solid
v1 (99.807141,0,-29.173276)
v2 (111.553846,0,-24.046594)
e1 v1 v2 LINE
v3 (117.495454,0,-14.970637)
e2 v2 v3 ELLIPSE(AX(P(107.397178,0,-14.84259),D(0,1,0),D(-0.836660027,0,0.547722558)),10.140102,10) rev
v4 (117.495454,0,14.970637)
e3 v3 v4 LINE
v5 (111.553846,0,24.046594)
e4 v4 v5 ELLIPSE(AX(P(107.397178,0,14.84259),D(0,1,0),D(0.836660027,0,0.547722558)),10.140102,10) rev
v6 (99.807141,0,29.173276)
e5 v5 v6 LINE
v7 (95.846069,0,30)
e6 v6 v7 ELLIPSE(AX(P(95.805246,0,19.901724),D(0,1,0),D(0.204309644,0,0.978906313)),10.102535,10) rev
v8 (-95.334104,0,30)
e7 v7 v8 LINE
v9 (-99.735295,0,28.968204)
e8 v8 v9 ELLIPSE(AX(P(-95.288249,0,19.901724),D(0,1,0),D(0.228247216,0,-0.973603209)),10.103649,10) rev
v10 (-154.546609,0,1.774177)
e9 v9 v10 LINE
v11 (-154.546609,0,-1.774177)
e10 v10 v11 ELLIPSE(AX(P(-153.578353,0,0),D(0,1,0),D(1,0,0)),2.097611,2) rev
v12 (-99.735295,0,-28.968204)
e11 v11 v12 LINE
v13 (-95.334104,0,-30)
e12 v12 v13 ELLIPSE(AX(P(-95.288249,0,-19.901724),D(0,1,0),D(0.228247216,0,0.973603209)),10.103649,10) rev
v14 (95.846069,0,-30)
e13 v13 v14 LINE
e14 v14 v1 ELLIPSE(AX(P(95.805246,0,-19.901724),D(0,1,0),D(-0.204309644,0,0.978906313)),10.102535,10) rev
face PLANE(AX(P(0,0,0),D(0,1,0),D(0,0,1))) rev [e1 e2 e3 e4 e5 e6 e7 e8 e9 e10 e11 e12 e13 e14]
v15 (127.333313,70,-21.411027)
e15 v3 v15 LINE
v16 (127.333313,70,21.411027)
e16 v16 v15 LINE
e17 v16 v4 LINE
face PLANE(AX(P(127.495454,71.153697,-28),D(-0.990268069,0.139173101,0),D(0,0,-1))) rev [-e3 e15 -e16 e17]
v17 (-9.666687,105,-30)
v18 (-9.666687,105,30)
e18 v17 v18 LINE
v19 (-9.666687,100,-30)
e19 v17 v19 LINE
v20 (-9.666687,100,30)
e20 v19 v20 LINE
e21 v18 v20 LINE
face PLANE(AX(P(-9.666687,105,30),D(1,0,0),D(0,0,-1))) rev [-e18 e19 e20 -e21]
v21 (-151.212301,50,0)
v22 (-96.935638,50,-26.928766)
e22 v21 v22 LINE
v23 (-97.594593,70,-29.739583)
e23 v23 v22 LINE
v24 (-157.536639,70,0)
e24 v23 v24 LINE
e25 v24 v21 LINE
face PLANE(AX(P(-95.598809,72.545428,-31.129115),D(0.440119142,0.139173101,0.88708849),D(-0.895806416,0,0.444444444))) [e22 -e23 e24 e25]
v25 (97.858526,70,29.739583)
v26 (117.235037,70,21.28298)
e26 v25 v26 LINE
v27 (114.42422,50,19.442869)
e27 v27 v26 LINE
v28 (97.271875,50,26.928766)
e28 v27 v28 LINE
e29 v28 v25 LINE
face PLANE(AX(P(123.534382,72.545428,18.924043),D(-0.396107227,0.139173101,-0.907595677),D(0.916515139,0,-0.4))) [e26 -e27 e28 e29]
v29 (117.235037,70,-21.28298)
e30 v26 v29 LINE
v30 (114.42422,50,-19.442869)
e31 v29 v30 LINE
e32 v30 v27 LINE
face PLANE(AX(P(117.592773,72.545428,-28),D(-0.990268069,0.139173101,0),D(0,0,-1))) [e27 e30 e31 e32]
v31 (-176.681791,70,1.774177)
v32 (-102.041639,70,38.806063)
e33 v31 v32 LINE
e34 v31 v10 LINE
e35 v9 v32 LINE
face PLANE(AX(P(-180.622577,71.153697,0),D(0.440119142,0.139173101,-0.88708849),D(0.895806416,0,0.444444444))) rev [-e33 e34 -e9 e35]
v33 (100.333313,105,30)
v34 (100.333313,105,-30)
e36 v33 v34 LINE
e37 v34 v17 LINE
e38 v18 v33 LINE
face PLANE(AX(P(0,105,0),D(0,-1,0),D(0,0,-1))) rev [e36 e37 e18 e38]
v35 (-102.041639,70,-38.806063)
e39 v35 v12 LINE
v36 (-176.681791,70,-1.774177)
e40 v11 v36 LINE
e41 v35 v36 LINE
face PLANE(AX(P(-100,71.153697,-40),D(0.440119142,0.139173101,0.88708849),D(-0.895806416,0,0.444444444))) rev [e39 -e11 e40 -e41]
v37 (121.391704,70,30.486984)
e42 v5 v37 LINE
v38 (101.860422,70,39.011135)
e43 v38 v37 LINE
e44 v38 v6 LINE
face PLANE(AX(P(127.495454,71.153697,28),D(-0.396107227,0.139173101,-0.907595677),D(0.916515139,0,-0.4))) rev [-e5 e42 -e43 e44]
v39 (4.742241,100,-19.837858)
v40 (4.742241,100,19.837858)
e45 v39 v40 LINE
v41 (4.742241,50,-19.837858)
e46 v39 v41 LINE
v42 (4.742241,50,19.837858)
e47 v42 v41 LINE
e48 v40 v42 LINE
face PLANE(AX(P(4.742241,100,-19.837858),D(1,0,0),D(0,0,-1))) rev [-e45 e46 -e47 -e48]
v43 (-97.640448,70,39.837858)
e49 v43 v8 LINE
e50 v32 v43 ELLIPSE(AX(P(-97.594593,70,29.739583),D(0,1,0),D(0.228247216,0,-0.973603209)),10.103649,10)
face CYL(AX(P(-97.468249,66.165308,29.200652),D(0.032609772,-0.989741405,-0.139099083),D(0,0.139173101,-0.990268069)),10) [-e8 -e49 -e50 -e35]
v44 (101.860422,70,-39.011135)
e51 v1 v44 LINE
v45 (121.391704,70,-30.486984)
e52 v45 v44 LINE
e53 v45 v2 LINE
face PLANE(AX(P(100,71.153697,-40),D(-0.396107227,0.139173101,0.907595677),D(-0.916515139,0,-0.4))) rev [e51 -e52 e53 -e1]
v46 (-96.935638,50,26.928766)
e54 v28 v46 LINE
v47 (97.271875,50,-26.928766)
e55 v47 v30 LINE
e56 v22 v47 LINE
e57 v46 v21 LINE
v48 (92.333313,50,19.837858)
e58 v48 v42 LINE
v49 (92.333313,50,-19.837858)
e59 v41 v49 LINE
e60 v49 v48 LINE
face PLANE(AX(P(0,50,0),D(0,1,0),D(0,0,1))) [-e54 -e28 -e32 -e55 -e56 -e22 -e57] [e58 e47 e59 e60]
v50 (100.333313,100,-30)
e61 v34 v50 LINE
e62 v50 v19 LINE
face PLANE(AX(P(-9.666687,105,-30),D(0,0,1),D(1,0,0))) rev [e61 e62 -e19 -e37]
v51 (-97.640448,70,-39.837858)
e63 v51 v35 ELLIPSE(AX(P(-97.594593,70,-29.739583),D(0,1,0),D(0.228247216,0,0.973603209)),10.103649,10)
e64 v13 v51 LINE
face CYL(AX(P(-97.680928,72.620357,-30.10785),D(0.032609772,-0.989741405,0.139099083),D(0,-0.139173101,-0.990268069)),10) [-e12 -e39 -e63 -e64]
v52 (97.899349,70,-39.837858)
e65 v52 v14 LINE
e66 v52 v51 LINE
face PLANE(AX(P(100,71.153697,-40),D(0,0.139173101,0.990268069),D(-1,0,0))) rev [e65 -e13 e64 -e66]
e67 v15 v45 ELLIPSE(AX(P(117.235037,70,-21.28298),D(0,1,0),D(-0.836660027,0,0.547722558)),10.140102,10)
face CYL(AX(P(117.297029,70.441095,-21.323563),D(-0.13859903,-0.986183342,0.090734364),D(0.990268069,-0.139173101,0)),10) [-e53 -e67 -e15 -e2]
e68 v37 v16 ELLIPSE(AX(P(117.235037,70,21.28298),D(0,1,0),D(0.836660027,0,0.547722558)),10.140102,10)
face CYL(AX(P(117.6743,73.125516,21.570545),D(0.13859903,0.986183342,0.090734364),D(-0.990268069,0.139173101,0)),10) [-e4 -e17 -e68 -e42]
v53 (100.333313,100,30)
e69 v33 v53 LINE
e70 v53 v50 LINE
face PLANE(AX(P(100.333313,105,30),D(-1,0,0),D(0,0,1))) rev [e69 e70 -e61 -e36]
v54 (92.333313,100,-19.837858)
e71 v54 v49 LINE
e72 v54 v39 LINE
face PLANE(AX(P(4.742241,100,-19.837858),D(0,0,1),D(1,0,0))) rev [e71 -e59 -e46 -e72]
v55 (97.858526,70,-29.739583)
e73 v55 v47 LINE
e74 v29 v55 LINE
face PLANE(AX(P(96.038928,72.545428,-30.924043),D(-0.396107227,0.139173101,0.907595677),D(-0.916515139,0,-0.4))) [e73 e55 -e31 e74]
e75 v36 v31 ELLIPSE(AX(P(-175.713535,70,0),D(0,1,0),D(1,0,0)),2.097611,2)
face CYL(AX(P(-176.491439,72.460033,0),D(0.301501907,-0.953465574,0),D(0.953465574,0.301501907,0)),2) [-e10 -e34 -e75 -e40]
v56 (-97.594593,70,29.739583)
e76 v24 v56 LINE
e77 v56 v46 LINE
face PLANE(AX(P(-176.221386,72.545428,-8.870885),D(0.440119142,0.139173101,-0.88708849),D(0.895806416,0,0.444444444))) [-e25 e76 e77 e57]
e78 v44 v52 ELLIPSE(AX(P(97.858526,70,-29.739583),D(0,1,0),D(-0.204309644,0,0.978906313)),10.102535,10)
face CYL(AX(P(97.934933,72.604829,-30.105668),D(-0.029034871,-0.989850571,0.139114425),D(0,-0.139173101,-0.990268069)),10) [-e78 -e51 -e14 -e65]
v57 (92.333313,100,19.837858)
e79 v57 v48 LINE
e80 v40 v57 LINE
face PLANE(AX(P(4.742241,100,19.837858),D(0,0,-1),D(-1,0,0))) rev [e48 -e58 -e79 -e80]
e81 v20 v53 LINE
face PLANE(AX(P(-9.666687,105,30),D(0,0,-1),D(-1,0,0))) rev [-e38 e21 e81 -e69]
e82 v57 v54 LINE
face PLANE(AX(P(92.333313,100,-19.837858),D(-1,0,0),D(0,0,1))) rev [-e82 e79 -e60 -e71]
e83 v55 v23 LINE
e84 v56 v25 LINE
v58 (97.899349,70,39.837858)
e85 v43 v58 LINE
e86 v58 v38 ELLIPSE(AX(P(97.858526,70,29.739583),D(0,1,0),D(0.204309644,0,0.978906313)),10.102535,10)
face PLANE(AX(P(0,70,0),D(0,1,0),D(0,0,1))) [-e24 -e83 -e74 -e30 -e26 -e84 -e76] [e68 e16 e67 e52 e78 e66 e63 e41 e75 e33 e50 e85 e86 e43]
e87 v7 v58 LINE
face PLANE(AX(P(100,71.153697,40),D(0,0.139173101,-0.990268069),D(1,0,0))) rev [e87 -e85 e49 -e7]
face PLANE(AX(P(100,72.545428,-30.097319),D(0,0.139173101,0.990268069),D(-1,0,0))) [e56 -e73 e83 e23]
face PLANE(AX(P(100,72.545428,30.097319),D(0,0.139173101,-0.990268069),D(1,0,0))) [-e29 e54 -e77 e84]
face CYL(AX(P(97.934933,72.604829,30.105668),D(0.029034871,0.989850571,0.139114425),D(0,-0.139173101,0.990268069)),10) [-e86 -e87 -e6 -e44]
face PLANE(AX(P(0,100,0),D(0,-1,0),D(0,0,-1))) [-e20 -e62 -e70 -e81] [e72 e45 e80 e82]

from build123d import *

# Parameters (mm, degrees)
SALIENTE_EXTRUIR1_DEPTH = 70
CHAFL_N1_SIZE           = 71.153697224
CHAFL_N1_SIZE_2         = 10
CHAFL_N2_SIZE           = 10
CHAFL_N2_SIZE_2         = 71.153697224
CHAFL_N3_SIZE           = 10
CHAFL_N3_SIZE_2         = 71.153697224
CHAFL_N4_SIZE           = 10
CHAFL_N4_SIZE_2         = 71.153697224
CHAFL_N6_SIZE           = 10
CHAFL_N6_SIZE_2         = 71.153697224
CHAFL_N7_SIZE           = 71.153697224
CHAFL_N7_SIZE_2         = 10
CHAFL_N8_SIZE           = 10
CHAFL_N8_SIZE_2         = 71.153697224
VACIADO2_DEPTH          = 20
VACIADO2_DRAFT          = -8
CROQUIS3_W              = 87.591071548
CROQUIS3_H              = 39.675716858
SALIENTE_EXTRUIR3_DEPTH = 30
CROQUIS4_W              = 110
CROQUIS4_H              = 60
SALIENTE_EXTRUIR4_DEPTH = 5
REDONDEO2_R             = 2
REDONDEO4_R             = 10
REDONDEO5_R             = 10


# Read off the part's stored shape, not the designer's step: Vaciado2
with BuildPart() as part:
    # Croquis1 → Saliente-Extruir1 (new body)
    with BuildSketch(Plane(origin=(0, 0, 0), x_dir=(1, 0, 0), z_dir=(0, 1, 0))):
        Polygon((100, -40), (-100, -40), (-180.622577483, 0), (-100, 40), (100, 40), (127.49545417, 28), (127.49545417, -28), align=None)
    extrude(amount=SALIENTE_EXTRUIR1_DEPTH)

    # Chaflán1
    # the kernel refuses this chamfer: 71.153697224, 10 mm, written as the material it takes off along each edge
    with BuildSketch(Plane(origin=(284.933017826, 0, 40), x_dir=(0, 0.999985663281603, 0.005354739139527623), z_dir=(-1, 0, 0))) as chafl_n1_piece_1:
        Polygon((CHAFL_N1_SIZE * 0.999985663279, CHAFL_N1_SIZE * 0.00535473913952), (-CHAFL_N1_SIZE_2 * 0.00535473913953, CHAFL_N1_SIZE_2 * 0.999985663282), (0, 0), align=None)
    extrude(amount=569.866035651, mode=Mode.SUBTRACT)

    # Chaflán2
    # the kernel refuses this chamfer: 71.153697224, 10 mm, written as the material it takes off along each edge
    with BuildSketch(Plane(origin=(45.508539616, 0, 112.192452367), x_dir=(0.4289599478157497, -0.26166085119417803, -0.8645964157468197), z_dir=(-0.895806416477617, 0, -0.44444444444444353))) as chafl_n2_piece_1:
        Polygon((CHAFL_N2_SIZE * 0.965159882585, -CHAFL_N2_SIZE * 0.261660851194), (-CHAFL_N2_SIZE_2 * 0.261660851194, -CHAFL_N2_SIZE_2 * 0.965159882583), (0, 0), align=None)
    extrude(amount=437.366035651, mode=Mode.SUBTRACT)

    # Chaflán3
    # the kernel refuses this chamfer: 71.153697224, 10 mm, written as the material it takes off along each edge
    with BuildSketch(Plane(origin=(-335.03676147, 0, 76.61088931), x_dir=(0.4289599478157518, -0.2616608511941785, 0.8645964157468186), z_dir=(0.895806416477616, 0, -0.4444444444444457))) as chafl_n3_piece_1:
        Polygon((CHAFL_N3_SIZE * 0.965159882585, -CHAFL_N3_SIZE * 0.261660851194), (-CHAFL_N3_SIZE_2 * 0.261660851194, -CHAFL_N3_SIZE_2 * 0.965159882583), (0, 0), align=None)
    extrude(amount=447.307518774, mode=Mode.SUBTRACT)

    # Chaflán4
    # the kernel refuses this chamfer: 71.153697224, 10 mm, written as the material it takes off along each edge
    with BuildSketch(Plane(origin=(-262.433017825, 0, -40), x_dir=(0, -0.26166085119417826, 0.9651598825854388), z_dir=(1, 0, 0))) as chafl_n4_piece_1:
        Polygon((CHAFL_N4_SIZE * 0.965159882585, -CHAFL_N4_SIZE * 0.261660851194), (-CHAFL_N4_SIZE_2 * 0.261660851194, -CHAFL_N4_SIZE_2 * 0.965159882583), (0, 0), align=None)
    extrude(amount=547.366035651, mode=Mode.SUBTRACT)

    # Chaflán6
    # the kernel refuses this chamfer: 71.153697224, 10 mm, written as the material it takes off along each edge
    with BuildSketch(Plane(origin=(-46.581032062, 0, -103.97320713), x_dir=(-0.3860639530341748, -0.2616608511941783, 0.8845836439364931), z_dir=(0.9165151389911683, 0, 0.3999999999999993))) as chafl_n6_piece_1:
        Polygon((CHAFL_N6_SIZE * 0.965159882585, -CHAFL_N6_SIZE * 0.261660851194), (-CHAFL_N6_SIZE_2 * 0.261660851194, -CHAFL_N6_SIZE_2 * 0.965159882583), (0, 0), align=None)
    extrude(amount=374.866035651, mode=Mode.SUBTRACT)

    # Chaflán7
    # the kernel refuses this chamfer: 71.153697224, 10 mm, written as the material it takes off along each edge
    with BuildSketch(Plane(origin=(296.989364706, 0, -45.97320713), x_dir=(0.002141895655810909, 0.999985663281603, 0.004907699486725296), z_dir=(-0.9165151389911683, 0, 0.3999999999999993))) as chafl_n7_piece_1:
        Polygon((CHAFL_N7_SIZE * 0.999985663279, CHAFL_N7_SIZE * 0.00535473913952), (-CHAFL_N7_SIZE_2 * 0.00535473913953, CHAFL_N7_SIZE_2 * 0.999985663282), (0, 0), align=None)
    extrude(amount=374.866035651, mode=Mode.SUBTRACT)

    # Chaflán8
    # the kernel refuses this chamfer: 71.153697224, 10 mm, written as the material it takes off along each edge
    with BuildSketch(Plane(origin=(127.49545417, 0, -202.022123314), x_dir=(-0.9651598825854388, -0.26166085119417826, 0), z_dir=(0, 0, 1))) as chafl_n8_piece_1:
        Polygon((CHAFL_N8_SIZE * 0.965159882585, -CHAFL_N8_SIZE * 0.261660851194), (-CHAFL_N8_SIZE_2 * 0.261660851194, -CHAFL_N8_SIZE_2 * 0.965159882583), (0, 0), align=None)
    extrude(amount=404.044246628, mode=Mode.SUBTRACT)


with BuildPart() as vaciado2_tool:
    # Vaciado2 outline → Vaciado2 (with draft: the straight prism first)
    with BuildSketch(Plane(origin=(0, 50, 0), x_dir=(1, 0, 0), z_dir=(0, 1, 0))):
        Polygon((114.42422018, 19.442868688), (97.271874618, 26.92876601), (-96.935637901, 26.92876601), (-151.212301005, 0), (-96.935637901, -26.92876601), (97.271874618, -26.92876601), (114.42422018, -19.442868688), align=None)
    extrude(amount=VACIADO2_DEPTH)
    # Vaciado2: the draft: its side faces are tilted about the plane it starts from
    vaciado2_sides = [vaciado2_tool.faces().sort_by_distance(p)[0] for p in [
        (105.848047399, 60, -23.185817349),
        (0.168118358, 60, -26.92876601),
        (-124.073969453, 60, -13.464383005),
        (-124.073969453, 60, 13.464383005),
        (0.168118358, 60, 26.92876601),
        (105.848047399, 60, 23.185817349),
        (114.42422018, 60, 0),
    ]]
    draft(vaciado2_sides, Plane(origin=(0, 50, 0), x_dir=(1, 0, 0), z_dir=(0, 1, 0)), VACIADO2_DRAFT)


with BuildPart() as part_1:
    add(part.part)

    # Vaciado2: cut by vaciado2_tool
    add(vaciado2_tool.part, mode=Mode.SUBTRACT)

    # Croquis3 → Saliente-Extruir3 (add, symmetric)
    with BuildSketch(Plane(origin=(0, 70, 0), x_dir=(1, 0, 0), z_dir=(0, 1, 0))):
        with Locations((48.537776825, 0)):
            Rectangle(CROQUIS3_W, CROQUIS3_H)
    extrude(amount=SALIENTE_EXTRUIR3_DEPTH, both=True)

    # Croquis4 → Saliente-Extruir4 (add)
    with BuildSketch(Plane(origin=(0, 100, 0), x_dir=(1, 0, 0), z_dir=(0, 1, 0))):
        with Locations((45.333312599, 0)):
            Rectangle(CROQUIS4_W, CROQUIS4_H)
    extrude(amount=SALIENTE_EXTRUIR4_DEPTH)

    # Redondeo2
    redondeo2_edges = [part_1.edges().sort_by_distance(p)[0] for p in [
        (-169.190168216, 35, 0),
    ]]
    fillet(redondeo2_edges, radius=REDONDEO2_R)

    # Redondeo4
    redondeo4_edges = [part_1.edges().sort_by_distance(p)[0] for p in [
        (98.939518779, 35, -34.918929215),
        (98.939518779, 35, 34.918929215),
        (122.414383384, 35, -24.673658359),
        (122.414383384, 35, 24.673658359),
    ]]
    fillet(redondeo4_edges, radius=REDONDEO4_R)

    # Redondeo5
    redondeo5_edges = [part_1.edges().sort_by_distance(p)[0] for p in [
        (-98.80881631, 35, 34.918929215),
        (-98.80881631, 35, -34.918929215),
    ]]
    fillet(redondeo5_edges, radius=REDONDEO5_R)


solid = part_1.part
